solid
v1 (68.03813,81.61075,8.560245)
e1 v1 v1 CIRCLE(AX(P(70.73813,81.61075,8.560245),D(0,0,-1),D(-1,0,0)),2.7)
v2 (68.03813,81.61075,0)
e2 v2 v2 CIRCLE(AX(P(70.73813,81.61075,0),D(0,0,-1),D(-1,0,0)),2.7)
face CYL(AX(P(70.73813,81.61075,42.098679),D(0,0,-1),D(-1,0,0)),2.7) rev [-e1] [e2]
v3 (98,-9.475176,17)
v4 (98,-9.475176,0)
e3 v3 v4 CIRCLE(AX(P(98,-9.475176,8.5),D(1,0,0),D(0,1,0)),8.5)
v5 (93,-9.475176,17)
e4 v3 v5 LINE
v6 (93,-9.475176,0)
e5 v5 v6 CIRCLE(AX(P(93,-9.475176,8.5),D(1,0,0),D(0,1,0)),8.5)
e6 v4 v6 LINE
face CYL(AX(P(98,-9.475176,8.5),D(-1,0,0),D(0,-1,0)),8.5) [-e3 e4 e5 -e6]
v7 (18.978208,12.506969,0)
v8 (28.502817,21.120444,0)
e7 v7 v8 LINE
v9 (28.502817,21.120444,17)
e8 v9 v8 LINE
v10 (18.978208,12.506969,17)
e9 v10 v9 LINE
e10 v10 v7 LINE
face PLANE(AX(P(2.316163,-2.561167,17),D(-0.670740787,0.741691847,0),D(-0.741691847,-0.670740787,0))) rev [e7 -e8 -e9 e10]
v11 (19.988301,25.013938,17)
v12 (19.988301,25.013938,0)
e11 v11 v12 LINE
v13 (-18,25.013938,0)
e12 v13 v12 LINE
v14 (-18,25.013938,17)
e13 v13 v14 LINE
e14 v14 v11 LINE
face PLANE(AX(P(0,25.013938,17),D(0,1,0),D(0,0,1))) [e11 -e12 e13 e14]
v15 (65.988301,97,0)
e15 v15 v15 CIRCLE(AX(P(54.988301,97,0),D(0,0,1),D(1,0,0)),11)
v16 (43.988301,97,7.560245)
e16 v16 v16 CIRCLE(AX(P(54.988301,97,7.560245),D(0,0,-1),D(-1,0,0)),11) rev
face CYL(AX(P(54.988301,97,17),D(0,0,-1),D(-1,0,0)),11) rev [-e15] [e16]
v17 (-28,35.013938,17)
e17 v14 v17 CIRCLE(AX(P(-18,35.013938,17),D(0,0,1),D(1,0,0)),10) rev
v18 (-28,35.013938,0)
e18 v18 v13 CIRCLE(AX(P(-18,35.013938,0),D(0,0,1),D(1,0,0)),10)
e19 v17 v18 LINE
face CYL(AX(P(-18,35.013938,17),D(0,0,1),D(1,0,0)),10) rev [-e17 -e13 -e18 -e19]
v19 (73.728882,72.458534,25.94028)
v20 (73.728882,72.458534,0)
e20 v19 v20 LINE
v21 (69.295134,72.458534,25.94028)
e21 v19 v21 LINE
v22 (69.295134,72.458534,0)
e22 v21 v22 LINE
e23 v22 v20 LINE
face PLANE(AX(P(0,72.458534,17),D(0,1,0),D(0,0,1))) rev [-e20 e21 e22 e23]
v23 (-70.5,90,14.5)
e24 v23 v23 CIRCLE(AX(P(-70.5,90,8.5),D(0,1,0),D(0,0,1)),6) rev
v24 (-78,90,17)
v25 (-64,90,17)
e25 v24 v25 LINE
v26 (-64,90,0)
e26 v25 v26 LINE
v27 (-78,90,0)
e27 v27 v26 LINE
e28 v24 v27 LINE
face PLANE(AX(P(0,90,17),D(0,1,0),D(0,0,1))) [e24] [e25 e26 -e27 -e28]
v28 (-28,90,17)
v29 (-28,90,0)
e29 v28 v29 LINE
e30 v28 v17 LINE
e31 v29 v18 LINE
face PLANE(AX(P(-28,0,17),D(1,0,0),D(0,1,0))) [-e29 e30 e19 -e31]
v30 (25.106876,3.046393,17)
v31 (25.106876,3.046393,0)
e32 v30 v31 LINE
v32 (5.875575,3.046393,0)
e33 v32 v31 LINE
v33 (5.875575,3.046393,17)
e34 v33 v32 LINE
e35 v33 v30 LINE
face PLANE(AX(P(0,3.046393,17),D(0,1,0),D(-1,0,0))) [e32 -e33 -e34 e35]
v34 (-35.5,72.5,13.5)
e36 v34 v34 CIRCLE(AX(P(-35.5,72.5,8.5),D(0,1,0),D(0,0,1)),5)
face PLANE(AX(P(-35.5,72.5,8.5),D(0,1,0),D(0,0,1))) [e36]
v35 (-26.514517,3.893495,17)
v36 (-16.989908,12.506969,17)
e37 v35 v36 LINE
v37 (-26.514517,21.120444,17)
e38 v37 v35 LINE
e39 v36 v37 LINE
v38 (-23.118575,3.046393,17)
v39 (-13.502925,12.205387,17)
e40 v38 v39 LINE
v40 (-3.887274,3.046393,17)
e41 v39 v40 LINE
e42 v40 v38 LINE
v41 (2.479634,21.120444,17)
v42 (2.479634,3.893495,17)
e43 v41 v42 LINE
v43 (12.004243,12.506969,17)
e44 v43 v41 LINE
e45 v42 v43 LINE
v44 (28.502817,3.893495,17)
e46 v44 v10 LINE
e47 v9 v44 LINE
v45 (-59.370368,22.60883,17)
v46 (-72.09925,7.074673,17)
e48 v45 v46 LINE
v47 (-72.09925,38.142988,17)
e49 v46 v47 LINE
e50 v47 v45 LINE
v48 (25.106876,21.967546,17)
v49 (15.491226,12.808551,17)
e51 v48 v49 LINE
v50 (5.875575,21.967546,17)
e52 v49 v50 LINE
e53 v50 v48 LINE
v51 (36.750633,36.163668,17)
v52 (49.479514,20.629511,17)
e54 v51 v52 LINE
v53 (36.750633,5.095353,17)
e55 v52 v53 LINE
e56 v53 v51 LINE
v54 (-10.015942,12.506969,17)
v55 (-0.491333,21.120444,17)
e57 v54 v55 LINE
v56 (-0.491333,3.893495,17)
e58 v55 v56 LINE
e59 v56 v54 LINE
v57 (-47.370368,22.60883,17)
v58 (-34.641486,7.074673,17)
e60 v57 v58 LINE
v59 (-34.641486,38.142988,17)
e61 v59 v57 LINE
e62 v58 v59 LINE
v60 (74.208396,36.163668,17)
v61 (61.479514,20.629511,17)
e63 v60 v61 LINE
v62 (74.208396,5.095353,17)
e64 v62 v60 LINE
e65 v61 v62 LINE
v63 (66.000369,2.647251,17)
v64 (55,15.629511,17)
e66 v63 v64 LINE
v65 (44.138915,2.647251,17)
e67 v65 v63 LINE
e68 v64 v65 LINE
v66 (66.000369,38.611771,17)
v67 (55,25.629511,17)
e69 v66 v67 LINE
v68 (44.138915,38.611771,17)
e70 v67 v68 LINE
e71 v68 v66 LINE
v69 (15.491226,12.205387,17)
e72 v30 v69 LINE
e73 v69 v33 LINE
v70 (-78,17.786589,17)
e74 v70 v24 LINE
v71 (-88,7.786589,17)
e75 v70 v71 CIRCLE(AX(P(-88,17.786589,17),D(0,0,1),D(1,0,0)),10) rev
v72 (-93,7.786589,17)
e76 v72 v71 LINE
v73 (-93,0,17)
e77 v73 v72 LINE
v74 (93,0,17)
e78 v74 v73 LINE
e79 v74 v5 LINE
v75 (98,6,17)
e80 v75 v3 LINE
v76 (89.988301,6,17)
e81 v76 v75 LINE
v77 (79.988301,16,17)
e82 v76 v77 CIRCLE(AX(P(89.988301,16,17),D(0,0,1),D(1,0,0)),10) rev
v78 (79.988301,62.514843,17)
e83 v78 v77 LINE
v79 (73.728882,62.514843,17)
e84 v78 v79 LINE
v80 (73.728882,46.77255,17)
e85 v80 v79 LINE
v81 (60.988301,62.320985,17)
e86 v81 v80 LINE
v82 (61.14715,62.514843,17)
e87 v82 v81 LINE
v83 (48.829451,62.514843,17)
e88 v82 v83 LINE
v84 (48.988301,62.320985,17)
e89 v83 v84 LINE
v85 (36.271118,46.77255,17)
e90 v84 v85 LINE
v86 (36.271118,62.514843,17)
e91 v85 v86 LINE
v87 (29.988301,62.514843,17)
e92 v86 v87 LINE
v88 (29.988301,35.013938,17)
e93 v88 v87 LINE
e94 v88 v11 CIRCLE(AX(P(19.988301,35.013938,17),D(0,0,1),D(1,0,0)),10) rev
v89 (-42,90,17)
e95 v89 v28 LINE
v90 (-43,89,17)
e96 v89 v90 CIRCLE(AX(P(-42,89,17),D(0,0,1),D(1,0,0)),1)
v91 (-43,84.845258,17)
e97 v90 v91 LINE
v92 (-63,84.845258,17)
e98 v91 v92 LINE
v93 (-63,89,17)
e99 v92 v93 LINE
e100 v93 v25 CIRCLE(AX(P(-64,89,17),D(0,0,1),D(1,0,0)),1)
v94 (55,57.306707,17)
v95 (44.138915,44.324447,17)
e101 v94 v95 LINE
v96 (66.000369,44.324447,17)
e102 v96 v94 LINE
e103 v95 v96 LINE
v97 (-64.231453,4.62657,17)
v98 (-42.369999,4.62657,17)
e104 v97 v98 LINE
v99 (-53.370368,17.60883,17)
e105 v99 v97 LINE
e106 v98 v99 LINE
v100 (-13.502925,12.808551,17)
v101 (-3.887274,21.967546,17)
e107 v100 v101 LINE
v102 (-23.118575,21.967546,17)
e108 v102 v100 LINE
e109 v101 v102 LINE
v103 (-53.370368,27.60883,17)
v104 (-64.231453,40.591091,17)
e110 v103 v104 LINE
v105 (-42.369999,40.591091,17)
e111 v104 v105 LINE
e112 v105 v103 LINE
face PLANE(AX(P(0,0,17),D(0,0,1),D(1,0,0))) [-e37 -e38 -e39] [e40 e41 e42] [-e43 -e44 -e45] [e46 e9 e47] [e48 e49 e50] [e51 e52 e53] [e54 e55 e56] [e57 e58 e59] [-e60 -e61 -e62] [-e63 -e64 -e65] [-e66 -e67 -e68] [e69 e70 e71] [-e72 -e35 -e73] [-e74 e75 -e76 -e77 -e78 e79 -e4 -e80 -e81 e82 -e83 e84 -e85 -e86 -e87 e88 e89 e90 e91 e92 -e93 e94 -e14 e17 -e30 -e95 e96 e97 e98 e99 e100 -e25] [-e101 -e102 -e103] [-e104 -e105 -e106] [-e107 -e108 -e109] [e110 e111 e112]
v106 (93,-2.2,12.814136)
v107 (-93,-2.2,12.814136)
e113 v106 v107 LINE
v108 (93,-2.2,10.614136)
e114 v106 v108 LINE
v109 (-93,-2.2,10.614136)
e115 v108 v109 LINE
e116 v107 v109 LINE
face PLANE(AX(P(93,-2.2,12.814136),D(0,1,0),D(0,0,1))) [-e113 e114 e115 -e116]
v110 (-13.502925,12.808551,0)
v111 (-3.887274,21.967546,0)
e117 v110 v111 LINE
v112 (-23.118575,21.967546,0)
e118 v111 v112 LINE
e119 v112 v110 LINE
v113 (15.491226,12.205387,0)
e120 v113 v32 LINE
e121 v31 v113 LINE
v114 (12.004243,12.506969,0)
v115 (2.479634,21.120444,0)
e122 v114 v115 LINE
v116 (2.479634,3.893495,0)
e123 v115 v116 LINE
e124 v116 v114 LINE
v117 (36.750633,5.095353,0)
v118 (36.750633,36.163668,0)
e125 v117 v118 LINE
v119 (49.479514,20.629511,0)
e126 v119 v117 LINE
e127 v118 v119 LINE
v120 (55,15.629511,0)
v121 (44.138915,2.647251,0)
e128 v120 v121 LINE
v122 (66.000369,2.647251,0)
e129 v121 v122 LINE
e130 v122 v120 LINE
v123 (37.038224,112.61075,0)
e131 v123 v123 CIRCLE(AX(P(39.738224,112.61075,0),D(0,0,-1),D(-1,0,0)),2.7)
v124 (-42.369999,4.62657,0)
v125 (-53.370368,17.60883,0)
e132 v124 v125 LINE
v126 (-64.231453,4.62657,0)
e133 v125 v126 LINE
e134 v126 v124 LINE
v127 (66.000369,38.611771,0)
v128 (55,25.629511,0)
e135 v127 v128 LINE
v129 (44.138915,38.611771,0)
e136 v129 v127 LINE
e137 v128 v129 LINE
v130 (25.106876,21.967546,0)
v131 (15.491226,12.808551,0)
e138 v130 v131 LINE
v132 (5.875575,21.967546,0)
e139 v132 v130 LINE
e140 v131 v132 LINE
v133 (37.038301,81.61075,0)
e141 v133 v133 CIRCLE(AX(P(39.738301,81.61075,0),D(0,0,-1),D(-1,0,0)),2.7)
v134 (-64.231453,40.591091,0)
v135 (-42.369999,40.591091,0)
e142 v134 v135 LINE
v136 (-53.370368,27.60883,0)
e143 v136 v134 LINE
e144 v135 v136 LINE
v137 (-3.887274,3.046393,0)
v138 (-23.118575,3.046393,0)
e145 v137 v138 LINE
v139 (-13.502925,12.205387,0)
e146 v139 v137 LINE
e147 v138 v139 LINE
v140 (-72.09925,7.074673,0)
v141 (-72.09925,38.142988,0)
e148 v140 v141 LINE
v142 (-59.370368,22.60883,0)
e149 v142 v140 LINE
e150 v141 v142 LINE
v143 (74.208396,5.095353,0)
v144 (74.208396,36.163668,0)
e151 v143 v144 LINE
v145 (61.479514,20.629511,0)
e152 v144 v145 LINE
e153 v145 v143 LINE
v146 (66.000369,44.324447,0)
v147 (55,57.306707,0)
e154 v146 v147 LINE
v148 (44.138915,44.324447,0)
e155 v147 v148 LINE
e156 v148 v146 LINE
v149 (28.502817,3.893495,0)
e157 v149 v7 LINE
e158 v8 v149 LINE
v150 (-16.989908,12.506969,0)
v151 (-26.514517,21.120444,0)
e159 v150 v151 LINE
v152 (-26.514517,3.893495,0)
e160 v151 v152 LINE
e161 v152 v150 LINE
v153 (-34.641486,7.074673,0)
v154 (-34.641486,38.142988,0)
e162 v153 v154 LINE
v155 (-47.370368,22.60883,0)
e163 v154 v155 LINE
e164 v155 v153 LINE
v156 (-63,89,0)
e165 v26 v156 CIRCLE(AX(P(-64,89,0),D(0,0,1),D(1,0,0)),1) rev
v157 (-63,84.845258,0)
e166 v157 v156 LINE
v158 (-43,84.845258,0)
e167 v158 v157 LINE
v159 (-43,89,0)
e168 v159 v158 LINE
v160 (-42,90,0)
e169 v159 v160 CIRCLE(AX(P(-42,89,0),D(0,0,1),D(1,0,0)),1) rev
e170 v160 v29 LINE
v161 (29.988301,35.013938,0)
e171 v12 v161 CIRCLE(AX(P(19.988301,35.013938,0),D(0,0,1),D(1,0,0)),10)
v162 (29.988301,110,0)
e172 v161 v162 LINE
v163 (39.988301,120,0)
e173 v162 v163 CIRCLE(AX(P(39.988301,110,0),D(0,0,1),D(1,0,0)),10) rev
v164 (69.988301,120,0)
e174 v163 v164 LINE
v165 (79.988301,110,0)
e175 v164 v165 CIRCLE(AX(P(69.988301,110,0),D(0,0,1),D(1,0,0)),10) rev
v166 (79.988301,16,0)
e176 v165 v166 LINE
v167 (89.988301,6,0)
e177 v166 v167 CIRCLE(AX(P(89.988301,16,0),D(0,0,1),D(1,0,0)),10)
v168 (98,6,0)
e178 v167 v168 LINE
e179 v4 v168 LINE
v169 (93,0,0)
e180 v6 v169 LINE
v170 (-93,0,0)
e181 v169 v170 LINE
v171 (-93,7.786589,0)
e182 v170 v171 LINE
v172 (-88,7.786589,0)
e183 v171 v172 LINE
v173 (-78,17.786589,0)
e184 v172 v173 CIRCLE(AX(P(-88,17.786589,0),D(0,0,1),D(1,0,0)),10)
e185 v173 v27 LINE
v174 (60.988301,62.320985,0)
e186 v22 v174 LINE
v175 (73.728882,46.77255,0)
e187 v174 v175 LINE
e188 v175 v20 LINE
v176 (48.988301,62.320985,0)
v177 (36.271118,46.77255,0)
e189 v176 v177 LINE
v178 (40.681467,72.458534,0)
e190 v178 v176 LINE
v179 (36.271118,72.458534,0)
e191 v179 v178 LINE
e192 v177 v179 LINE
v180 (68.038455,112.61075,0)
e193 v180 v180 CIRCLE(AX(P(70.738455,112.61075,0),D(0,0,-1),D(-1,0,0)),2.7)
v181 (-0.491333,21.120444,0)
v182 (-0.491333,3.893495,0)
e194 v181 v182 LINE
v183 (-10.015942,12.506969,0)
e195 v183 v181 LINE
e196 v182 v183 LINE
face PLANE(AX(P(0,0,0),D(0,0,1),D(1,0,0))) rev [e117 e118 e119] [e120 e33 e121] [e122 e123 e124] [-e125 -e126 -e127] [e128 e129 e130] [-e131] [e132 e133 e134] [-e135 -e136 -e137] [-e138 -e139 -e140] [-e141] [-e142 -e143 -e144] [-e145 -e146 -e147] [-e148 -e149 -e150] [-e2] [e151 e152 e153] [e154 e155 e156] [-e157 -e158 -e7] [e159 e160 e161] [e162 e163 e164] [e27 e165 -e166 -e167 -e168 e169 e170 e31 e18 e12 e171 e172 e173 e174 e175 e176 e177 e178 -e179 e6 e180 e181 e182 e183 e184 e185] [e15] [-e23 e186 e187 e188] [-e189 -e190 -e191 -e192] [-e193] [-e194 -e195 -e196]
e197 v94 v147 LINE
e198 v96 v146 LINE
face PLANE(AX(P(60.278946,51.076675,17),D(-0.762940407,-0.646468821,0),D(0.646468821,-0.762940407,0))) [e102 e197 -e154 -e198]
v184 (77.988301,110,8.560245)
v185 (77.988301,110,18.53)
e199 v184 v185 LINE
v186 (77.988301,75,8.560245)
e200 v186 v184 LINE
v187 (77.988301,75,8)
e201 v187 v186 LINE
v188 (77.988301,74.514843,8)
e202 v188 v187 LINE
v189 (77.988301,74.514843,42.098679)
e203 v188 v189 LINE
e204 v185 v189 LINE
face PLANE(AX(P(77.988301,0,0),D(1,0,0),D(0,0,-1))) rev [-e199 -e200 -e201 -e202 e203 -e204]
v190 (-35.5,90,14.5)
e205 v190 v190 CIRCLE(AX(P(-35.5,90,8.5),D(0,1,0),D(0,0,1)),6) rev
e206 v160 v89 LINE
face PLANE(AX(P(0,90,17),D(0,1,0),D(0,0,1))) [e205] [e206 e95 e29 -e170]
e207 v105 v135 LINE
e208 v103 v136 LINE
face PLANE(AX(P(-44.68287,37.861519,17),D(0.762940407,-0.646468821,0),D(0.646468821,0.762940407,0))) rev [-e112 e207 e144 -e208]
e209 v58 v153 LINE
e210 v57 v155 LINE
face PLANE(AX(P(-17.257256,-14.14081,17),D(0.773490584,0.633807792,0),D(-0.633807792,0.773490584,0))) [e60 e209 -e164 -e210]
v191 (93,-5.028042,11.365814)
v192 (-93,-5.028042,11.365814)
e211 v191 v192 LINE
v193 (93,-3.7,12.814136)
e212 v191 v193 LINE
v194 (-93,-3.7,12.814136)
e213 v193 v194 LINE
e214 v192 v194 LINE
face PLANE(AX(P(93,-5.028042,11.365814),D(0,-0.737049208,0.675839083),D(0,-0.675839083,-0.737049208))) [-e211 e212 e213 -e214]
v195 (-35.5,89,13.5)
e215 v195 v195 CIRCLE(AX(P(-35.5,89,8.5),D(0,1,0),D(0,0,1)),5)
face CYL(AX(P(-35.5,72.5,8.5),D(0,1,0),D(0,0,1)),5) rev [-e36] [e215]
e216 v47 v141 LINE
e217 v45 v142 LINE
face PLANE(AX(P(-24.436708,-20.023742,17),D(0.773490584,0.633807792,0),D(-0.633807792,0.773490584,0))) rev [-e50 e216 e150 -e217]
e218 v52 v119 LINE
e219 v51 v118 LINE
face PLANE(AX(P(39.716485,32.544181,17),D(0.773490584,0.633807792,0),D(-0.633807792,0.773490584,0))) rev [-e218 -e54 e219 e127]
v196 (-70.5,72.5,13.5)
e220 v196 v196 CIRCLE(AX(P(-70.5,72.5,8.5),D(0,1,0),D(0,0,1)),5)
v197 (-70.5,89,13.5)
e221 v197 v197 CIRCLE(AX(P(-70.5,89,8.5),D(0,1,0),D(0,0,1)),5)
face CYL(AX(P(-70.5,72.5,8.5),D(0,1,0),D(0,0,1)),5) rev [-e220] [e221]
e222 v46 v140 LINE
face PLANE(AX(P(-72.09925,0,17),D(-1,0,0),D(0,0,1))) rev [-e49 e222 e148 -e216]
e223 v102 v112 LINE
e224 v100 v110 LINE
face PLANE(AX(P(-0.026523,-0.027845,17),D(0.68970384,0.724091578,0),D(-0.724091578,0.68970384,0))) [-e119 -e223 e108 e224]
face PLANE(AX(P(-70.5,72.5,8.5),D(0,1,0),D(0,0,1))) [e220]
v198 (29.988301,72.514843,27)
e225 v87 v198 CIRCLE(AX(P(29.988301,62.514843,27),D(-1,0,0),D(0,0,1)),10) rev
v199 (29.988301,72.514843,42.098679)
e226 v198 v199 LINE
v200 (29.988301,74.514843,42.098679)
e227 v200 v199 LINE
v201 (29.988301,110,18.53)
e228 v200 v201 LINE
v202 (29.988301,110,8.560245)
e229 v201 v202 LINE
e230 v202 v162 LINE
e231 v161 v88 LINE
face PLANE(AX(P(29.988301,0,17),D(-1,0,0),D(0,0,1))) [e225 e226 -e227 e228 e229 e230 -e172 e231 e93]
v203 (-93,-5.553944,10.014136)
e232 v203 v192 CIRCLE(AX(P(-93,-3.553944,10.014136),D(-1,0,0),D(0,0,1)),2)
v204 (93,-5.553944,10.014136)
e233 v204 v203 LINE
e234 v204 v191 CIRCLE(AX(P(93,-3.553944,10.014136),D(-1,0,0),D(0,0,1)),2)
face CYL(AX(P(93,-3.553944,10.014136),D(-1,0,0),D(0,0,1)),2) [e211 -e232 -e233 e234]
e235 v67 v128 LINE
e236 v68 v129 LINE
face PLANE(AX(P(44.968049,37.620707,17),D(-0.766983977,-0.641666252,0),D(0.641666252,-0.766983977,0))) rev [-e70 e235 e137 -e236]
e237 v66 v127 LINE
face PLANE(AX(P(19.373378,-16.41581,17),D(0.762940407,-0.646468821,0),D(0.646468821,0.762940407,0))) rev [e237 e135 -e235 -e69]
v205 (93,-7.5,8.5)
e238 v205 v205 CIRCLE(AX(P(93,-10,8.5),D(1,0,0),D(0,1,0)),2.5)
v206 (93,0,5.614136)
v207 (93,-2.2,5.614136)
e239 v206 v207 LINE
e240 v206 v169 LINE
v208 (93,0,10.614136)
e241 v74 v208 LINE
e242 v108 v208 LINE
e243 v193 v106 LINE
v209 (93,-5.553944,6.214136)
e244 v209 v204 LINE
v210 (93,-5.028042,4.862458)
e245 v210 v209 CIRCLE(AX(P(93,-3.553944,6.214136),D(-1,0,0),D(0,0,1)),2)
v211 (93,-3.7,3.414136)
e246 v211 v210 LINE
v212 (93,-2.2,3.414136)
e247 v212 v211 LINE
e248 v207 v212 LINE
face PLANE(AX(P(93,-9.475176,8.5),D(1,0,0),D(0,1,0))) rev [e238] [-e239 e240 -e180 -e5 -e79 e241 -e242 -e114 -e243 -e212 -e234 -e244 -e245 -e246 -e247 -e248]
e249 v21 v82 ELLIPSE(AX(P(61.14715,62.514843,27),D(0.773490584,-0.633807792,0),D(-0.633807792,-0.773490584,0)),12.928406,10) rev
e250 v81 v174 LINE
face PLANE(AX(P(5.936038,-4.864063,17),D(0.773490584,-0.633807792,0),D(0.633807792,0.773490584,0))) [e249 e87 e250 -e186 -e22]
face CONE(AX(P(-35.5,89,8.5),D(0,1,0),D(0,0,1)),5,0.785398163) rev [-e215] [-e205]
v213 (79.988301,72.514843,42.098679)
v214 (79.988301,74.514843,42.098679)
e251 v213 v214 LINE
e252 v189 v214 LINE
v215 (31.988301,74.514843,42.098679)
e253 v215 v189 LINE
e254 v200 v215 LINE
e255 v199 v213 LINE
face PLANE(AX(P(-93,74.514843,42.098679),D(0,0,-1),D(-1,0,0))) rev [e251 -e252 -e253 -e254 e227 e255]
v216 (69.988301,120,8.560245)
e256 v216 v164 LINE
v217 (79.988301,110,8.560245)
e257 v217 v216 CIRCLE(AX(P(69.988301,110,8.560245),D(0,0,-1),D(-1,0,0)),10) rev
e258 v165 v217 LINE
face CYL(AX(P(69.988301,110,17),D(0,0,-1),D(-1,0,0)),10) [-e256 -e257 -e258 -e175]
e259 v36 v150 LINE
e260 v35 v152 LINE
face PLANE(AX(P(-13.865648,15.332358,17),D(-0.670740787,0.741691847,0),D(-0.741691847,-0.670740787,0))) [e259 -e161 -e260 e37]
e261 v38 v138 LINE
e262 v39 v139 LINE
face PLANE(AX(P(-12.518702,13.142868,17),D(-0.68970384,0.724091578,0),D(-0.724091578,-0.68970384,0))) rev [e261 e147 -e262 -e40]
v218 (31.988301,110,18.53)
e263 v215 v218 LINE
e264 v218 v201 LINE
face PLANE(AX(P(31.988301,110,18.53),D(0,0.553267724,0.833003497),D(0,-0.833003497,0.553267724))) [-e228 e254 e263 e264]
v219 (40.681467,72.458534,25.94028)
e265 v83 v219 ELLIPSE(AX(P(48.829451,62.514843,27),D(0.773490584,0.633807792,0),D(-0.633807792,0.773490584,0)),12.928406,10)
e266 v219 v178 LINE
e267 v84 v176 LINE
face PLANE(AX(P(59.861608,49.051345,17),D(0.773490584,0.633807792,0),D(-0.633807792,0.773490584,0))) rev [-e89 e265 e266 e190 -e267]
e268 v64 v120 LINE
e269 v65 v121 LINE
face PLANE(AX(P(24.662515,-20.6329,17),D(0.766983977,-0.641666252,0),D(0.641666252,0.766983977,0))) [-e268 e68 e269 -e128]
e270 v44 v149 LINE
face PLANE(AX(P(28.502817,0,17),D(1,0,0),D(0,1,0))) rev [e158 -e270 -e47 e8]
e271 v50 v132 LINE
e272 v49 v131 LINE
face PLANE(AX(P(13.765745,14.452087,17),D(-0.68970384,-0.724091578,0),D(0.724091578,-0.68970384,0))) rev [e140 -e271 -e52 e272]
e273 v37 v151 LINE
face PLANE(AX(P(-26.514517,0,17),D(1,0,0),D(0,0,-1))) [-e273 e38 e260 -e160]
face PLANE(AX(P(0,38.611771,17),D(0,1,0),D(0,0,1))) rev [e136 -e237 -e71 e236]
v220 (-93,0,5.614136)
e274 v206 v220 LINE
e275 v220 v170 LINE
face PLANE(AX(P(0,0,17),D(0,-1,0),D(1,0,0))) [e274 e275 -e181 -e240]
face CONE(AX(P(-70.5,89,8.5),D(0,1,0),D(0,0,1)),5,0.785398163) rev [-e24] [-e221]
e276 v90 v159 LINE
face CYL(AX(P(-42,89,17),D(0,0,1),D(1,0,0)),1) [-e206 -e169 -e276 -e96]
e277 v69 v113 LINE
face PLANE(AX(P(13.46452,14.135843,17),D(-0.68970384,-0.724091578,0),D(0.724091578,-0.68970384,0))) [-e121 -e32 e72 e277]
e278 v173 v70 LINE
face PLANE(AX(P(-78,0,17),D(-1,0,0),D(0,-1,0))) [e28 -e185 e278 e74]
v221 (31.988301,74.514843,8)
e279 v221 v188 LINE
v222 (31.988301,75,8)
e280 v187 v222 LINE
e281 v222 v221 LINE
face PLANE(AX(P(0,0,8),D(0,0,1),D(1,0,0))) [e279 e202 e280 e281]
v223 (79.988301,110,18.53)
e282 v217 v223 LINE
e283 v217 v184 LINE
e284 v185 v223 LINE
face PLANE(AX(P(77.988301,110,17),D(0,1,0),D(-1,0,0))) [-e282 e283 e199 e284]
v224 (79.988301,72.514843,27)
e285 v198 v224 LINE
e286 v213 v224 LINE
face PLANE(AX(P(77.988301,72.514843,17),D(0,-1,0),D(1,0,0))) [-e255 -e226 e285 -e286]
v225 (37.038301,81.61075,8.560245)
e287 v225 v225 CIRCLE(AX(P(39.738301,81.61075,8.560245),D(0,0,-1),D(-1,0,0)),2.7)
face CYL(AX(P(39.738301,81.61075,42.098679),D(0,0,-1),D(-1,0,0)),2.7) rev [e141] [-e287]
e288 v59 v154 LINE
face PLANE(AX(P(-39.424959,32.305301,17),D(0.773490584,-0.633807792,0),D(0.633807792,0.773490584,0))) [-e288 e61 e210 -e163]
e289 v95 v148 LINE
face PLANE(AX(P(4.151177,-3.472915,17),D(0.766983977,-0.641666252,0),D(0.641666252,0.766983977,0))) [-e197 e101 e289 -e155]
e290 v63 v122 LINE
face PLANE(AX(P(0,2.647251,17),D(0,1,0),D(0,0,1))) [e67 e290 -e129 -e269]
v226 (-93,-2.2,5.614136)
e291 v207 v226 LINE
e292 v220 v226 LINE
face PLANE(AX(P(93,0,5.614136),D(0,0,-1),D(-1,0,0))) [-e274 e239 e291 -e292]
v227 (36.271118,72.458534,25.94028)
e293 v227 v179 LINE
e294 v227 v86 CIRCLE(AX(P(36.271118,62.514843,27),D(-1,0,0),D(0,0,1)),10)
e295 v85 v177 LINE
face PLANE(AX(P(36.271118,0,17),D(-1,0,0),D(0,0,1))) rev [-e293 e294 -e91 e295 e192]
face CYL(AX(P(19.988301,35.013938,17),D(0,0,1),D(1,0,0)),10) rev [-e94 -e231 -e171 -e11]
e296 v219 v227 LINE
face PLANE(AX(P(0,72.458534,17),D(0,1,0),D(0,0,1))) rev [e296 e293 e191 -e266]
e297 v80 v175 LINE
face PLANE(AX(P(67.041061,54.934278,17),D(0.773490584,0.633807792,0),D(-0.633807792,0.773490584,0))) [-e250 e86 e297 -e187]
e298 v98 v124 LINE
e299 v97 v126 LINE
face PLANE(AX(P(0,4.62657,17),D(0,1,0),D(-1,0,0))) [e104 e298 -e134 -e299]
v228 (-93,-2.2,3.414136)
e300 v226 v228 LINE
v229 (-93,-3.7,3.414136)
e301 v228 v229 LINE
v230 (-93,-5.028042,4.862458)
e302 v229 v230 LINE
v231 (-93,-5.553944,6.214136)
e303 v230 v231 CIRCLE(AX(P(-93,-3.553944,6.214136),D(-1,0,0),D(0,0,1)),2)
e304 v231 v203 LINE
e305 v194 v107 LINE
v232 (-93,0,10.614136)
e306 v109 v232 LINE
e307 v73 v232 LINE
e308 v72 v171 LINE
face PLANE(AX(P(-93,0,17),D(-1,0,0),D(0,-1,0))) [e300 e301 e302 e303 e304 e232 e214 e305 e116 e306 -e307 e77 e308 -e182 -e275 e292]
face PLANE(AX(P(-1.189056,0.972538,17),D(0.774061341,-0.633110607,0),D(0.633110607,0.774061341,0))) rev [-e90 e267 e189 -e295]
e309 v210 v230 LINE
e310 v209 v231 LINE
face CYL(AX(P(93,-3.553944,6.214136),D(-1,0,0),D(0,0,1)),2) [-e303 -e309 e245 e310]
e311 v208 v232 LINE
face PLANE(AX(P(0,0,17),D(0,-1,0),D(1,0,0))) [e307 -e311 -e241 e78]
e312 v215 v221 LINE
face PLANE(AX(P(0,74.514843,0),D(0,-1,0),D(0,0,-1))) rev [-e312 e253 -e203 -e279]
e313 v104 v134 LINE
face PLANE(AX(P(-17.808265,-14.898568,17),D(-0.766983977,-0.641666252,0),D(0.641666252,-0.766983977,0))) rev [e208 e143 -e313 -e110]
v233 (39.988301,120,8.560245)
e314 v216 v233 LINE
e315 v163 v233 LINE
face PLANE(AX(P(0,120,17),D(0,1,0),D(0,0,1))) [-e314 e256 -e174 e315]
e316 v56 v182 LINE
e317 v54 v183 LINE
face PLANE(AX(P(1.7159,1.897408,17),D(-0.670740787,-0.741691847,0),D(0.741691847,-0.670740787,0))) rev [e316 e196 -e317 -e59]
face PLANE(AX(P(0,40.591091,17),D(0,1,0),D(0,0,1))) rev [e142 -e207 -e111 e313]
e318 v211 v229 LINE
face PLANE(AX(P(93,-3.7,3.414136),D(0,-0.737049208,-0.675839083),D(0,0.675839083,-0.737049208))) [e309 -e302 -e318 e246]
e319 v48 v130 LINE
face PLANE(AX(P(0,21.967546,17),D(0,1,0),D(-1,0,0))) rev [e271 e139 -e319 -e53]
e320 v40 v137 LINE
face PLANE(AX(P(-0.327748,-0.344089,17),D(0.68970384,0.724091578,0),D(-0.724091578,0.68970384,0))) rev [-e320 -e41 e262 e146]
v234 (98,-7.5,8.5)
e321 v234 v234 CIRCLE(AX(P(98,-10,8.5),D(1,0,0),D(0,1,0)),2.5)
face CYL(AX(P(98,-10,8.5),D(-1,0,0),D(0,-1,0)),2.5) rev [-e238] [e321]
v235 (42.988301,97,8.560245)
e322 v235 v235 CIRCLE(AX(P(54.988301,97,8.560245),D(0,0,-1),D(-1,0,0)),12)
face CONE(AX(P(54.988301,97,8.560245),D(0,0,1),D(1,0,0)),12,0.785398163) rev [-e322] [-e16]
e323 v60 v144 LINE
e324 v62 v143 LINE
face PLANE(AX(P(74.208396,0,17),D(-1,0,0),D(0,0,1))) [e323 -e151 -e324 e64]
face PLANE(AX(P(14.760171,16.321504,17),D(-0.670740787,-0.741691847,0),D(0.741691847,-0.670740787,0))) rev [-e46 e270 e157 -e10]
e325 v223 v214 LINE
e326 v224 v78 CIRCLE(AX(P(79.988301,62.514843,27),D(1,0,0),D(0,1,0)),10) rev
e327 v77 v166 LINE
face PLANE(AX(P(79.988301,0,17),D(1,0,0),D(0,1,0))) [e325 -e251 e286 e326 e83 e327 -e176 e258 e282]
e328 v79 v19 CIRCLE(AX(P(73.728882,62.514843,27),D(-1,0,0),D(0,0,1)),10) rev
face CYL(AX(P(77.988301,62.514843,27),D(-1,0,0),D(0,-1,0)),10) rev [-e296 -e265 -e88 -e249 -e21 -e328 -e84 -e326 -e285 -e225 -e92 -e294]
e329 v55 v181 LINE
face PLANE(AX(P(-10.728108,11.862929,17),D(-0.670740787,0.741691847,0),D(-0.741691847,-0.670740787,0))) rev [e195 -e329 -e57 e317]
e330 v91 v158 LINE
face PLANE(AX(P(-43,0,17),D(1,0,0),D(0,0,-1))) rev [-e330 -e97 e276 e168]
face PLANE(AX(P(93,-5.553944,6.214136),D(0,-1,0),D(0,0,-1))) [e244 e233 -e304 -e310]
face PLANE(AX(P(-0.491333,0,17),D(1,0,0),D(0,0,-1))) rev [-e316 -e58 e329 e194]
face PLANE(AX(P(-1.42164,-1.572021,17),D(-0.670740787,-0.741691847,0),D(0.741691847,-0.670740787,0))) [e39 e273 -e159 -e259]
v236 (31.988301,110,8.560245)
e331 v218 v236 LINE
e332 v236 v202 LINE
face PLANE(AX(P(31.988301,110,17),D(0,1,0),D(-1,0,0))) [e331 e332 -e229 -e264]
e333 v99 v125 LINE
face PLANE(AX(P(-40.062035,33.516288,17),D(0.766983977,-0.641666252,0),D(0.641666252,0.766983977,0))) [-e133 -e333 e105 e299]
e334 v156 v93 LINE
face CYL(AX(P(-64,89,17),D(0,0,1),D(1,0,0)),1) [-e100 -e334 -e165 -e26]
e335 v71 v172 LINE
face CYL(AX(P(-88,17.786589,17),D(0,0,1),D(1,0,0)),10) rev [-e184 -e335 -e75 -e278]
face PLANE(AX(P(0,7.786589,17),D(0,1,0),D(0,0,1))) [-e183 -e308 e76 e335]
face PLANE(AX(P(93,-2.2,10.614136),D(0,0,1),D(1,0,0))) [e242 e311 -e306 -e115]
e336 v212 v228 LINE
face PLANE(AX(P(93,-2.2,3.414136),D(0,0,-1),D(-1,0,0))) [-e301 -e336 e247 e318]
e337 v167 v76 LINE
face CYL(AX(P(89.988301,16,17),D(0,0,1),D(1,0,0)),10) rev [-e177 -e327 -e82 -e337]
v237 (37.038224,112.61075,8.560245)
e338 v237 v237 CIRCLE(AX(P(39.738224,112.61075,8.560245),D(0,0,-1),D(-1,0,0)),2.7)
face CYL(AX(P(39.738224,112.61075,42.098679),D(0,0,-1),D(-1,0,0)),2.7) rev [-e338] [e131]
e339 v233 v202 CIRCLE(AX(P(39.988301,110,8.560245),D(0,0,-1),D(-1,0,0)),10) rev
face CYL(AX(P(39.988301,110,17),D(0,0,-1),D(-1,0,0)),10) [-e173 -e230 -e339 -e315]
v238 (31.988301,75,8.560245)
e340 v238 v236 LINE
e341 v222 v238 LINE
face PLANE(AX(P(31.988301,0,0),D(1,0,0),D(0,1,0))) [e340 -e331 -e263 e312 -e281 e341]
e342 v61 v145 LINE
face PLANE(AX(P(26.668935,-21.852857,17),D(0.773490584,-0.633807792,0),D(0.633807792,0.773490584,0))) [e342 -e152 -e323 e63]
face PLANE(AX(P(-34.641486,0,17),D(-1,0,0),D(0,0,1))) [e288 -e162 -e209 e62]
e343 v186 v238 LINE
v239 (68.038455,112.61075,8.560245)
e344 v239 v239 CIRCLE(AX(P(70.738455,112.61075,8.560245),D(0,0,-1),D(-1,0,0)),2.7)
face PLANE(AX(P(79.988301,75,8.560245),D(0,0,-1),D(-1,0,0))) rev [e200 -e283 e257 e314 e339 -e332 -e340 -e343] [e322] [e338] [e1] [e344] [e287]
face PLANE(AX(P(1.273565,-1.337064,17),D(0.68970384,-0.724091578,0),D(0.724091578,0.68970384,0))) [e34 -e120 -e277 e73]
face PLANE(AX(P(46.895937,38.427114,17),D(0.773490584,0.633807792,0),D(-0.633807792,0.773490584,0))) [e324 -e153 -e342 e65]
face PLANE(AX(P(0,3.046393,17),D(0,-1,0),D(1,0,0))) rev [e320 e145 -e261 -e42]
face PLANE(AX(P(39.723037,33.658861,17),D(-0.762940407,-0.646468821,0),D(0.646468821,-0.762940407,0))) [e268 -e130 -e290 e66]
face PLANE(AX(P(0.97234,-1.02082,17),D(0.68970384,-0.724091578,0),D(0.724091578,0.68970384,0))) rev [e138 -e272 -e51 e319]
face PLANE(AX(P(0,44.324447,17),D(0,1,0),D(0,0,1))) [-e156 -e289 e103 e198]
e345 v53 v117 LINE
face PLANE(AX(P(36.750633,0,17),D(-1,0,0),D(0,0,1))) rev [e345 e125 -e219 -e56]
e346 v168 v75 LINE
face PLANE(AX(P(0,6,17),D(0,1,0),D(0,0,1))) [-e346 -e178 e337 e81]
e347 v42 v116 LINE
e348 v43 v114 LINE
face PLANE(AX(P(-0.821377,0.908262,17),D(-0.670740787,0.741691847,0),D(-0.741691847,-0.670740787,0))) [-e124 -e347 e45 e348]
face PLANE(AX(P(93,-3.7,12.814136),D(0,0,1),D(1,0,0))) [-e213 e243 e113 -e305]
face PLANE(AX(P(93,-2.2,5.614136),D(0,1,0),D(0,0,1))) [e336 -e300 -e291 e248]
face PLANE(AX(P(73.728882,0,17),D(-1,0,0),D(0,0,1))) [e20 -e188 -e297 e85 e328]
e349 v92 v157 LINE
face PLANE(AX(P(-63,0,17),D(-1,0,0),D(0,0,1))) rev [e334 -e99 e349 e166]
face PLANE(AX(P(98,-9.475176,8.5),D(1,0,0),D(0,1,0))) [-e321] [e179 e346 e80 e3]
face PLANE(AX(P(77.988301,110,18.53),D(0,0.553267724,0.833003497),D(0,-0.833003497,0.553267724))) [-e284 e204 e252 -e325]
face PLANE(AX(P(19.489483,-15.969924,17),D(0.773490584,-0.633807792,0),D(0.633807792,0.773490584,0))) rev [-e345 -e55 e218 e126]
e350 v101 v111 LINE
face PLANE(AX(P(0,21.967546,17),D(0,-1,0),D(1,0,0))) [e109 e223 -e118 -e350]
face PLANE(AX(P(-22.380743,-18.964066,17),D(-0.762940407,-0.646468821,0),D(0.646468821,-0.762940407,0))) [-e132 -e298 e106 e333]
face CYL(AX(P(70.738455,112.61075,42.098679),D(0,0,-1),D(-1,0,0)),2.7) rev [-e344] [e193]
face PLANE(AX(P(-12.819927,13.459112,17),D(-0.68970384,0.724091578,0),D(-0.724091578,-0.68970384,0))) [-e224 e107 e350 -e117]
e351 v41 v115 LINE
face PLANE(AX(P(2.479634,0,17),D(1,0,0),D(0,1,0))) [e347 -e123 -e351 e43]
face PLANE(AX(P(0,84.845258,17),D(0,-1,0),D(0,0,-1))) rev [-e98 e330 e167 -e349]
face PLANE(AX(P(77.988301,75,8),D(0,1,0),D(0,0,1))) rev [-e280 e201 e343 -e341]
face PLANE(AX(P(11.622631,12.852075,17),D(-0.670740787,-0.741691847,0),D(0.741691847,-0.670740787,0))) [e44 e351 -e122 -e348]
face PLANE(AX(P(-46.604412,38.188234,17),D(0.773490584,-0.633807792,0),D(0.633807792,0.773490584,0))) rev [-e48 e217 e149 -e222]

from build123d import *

# Parameters (mm, degrees)
CROQUIS1_R                = 11
SALIENTE_EXTRUIR1_DEPTH   = 17
REDONDEO1_R               = 10
REDONDEO2_R               = 10
REDONDEO8_R               = 10
REDONDEO9_R               = 10
REDONDEO11_R              = 10
REDONDEO12_R              = 10
SALIENTE_EXTRUIR2_DEPTH   = 186
CROQUIS5_R                = 2.5
SALIENTE_EXTRUIR6_DEPTH   = 5
CORTAR_EXTRUIR5_START     = -5
CORTAR_EXTRUIR5_OUTLINE_R = 11
CORTAR_EXTRUIR5_DEPTH     = 5
SALIENTE_EXTRUIR7_DEPTH   = 2
SALIENTE_EXTRUIR8_DEPTH   = 2
CROQUIS16_W               = 46
CROQUIS16_H               = 26.427047574
SALIENTE_EXTRUIR9_DEPTH   = 2
CROQUIS18_W               = 50
CROQUIS18_H               = 8.439754805
CORTAR_EXTRUIR7_DEPTH     = 45
CROQUIS19_W               = 2
CROQUIS19_H               = 8.439754805
SALIENTE_EXTRUIR10_DEPTH  = 35
CROQUIS20_W               = 46
CROQUIS20_H               = 0.485157357
CORTAR_EXTRUIR8_DEPTH     = 9
REDONDEO13_R              = 10
SKETCH1_W                 = 1.328368311
SKETCH1_H                 = 2
CUT_EXTRUDE1_DEPTH        = 215.967115272
SKETCH3_R                 = 2.7
CUT_EXTRUDE2_DEPTH        = 161.549988464
SKETCH4_R                 = 5
CUT_EXTRUDE3_DEPTH        = 17.5
FILLET1_R                 = 1
CHAMFER1_SIZE             = 1


# Read off the part's stored shape, not the designer's step: Cortar-Extruir5
with BuildPart() as part:
    # Croquis1 → Saliente-Extruir1 (new body)
    with BuildSketch(Plane.XY):
        Polygon((-93, 0), (93, 0), (93, 6), (79.988300723, 6), (79.988300723, 120), (29.988300723, 120), (29.988300723, 25.013938177), (-28, 25.013938177), (-28, 90), (-43, 90), (-43, 84.845258293), (-63, 84.845258293), (-63, 90), (-78, 90), (-78, 7.786589187), (-93, 7.786589187), align=None)
        Polygon((-53.370368055, 17.608830496), (-42.369998576, 4.626570416), (-64.231453048, 4.626570416), align=None, mode=Mode.SUBTRACT)
        Polygon((-72.099249791, 38.14298816), (-59.370368055, 22.608830496), (-72.099249791, 7.074672833), align=None, mode=Mode.SUBTRACT)
        Polygon((-3.887274434, 3.04639267), (-23.118575204, 3.04639267), (-13.502924819, 12.205387461), align=None, mode=Mode.SUBTRACT)
        Polygon((-26.514516656, 3.893494584), (-26.514516656, 21.120443592), (-16.989907544, 12.506969088), align=None, mode=Mode.SUBTRACT)
        Polygon((-10.015942094, 12.506969088), (-0.491332982, 21.120443592), (-0.491332982, 3.893494584), align=None, mode=Mode.SUBTRACT)
        Polygon((-34.641486319, 7.074672833), (-47.370368055, 22.608830496), (-34.641486319, 38.14298816), align=None, mode=Mode.SUBTRACT)
        Polygon((-13.502924819, 12.808550716), (-23.118575204, 21.967545507), (-3.887274434, 21.967545507), align=None, mode=Mode.SUBTRACT)
        Polygon((-53.370368055, 27.608830496), (-64.231453048, 40.591090577), (-42.369998576, 40.591090577), align=None, mode=Mode.SUBTRACT)
        Polygon((2.479633706, 3.893494584), (2.479633706, 21.120443592), (12.004242818, 12.506969088), align=None, mode=Mode.SUBTRACT)
        Polygon((5.875575158, 3.04639267), (15.491225543, 12.205387461), (25.106875927, 3.04639267), align=None, mode=Mode.SUBTRACT)
        Polygon((28.50281738, 21.120443592), (28.50281738, 3.893494584), (18.978208267, 12.506969088), align=None, mode=Mode.SUBTRACT)
        Polygon((5.875575158, 21.967545507), (25.106875927, 21.967545507), (15.491225543, 12.808550716), align=None, mode=Mode.SUBTRACT)
        Polygon((36.750632631, 36.163668304), (49.479514367, 20.629510641), (36.750632631, 5.095352977), align=None, mode=Mode.SUBTRACT)
        Polygon((55, 15.629510641), (66.000369479, 2.64725056), (44.138915007, 2.64725056), align=None, mode=Mode.SUBTRACT)
        Polygon((74.208396103, 5.095352977), (61.479514367, 20.629510641), (74.208396103, 36.163668304), align=None, mode=Mode.SUBTRACT)
        Polygon((40.681467462, 72.45853374), (48.988300723, 62.320985113), (36.271118264, 46.772549809), (36.271118264, 72.45853374), align=None, mode=Mode.SUBTRACT)
        Polygon((55, 25.629510641), (44.138915007, 38.611770721), (66.000369479, 38.611770721), align=None, mode=Mode.SUBTRACT)
        Polygon((55, 57.306707472), (66.000369479, 44.324447392), (44.138915007, 44.324447392), align=None, mode=Mode.SUBTRACT)
        Polygon((73.728881736, 46.772549809), (60.988300723, 62.320985113), (69.295133985, 72.45853374), (73.728881736, 72.45853374), align=None, mode=Mode.SUBTRACT)
        with Locations((54.988300723, 97)):
            Circle(CROQUIS1_R, mode=Mode.SUBTRACT)
    extrude(amount=SALIENTE_EXTRUIR1_DEPTH)

    # Redondeo1
    redondeo1_edges = [part.edges().sort_by_distance(p)[0] for p in [
        (79.988300723, 120, 8.5),
    ]]
    fillet(redondeo1_edges, radius=REDONDEO1_R)

    # Redondeo2
    redondeo2_edges = [part.edges().sort_by_distance(p)[0] for p in [
        (29.988300723, 120, 8.5),
    ]]
    fillet(redondeo2_edges, radius=REDONDEO2_R)

    # Redondeo8
    redondeo8_edges = [part.edges().sort_by_distance(p)[0] for p in [
        (29.988300723, 25.013938177, 8.5),
    ]]
    fillet(redondeo8_edges, radius=REDONDEO8_R)

    # Redondeo9
    redondeo9_edges = [part.edges().sort_by_distance(p)[0] for p in [
        (-28, 25.013938177, 8.5),
    ]]
    fillet(redondeo9_edges, radius=REDONDEO9_R)

    # Redondeo11
    redondeo11_edges = [part.edges().sort_by_distance(p)[0] for p in [
        (79.988300723, 6, 8.5),
    ]]
    fillet(redondeo11_edges, radius=REDONDEO11_R)

    # Redondeo12
    redondeo12_edges = [part.edges().sort_by_distance(p)[0] for p in [
        (-78, 7.786589187, 8.5),
    ]]
    fillet(redondeo12_edges, radius=REDONDEO12_R)

    # Croquis4 → Saliente-Extruir2 (add)
    with BuildSketch(Plane.ZY.offset(93)):
        with BuildLine():
            Line((5.614135824, 0), (5.614135824, -2.2))
            Line((5.614135824, -2.2), (3.414135824, -2.2))
            Line((3.414135824, -2.2), (3.414135824, -3.7))
            Line((3.414135824, -3.7), (4.862457658, -5.028042266))
            ThreePointArc((4.862457658, -5.028042266), (5.488945101, -5.4178372), (6.214135824, -5.553943851))
            Line((6.214135824, -5.553943851), (10.014135824, -5.553943851))
            ThreePointArc((10.014135824, -5.553943851), (10.739326546, -5.4178372), (11.365813989, -5.028042266))
            Line((11.365813989, -5.028042266), (12.814135824, -3.7))
            Line((12.814135824, -3.7), (12.814135824, -2.2))
            Line((12.814135824, -2.2), (10.614135824, -2.2))
            Line((10.614135824, -2.2), (10.614135824, 0))
            Line((10.614135824, 0), (5.614135824, 0))
        make_face()
    extrude(amount=-SALIENTE_EXTRUIR2_DEPTH)

    # Croquis5 → Saliente-Extruir6 (add)
    with BuildSketch(Plane(origin=(93, 0, 0), x_dir=(0, 0, -1), z_dir=(1, 0, 0))):
        with BuildLine():
            Line((-17, 6), (0, 6))
            Line((0, 6), (0, 0))
            Line((0, 0), (0, -9.475176398))
            ThreePointArc((0, -9.475176398), (-8.5, -17.975176398), (-17, -9.475176398))
            Line((-17, -9.475176398), (-17, 0))
            Line((-17, 0), (-17, 6))
        make_face()
        with Locations(Location((-8.5, -10, 0), (0, 0, 90))):
            Circle(CROQUIS5_R, mode=Mode.SUBTRACT)
    extrude(amount=SALIENTE_EXTRUIR6_DEPTH)

    # Cortar-Extruir5 outline → Cortar-Extruir5 (cut)
    with BuildSketch(Plane.XY.offset(17).offset(CORTAR_EXTRUIR5_START)):
        with BuildLine():
            ThreePointArc((36.990583657, 100.021275878), (34.88853317, 96.589149148), (37.130323879, 93.246622476))
            Line((37.130323879, 93.246622476), (49.081988054, 86.302507362))
            ThreePointArc((49.081988054, 86.302507362), (55.135782124, 84.669748862), (61.191322119, 86.29602016))
            Line((61.191322119, 86.29602016), (73.177641255, 93.243103052))
            ThreePointArc((73.177641255, 93.243103052), (75.516378848, 96.608558865), (73.365004561, 100.096763995))
            Line((73.365004561, 100.096763995), (61.202501164, 107.163380194))
            ThreePointArc((61.202501164, 107.163380194), (55.196638443, 108.796017791), (49.176296726, 107.217607778))
            Line((49.176296726, 107.217607778), (36.990583657, 100.021275878))
        make_face()
        with Locations((54.988300723, 97)):
            Circle(CORTAR_EXTRUIR5_OUTLINE_R, mode=Mode.SUBTRACT)
    extrude(amount=CORTAR_EXTRUIR5_DEPTH, mode=Mode.SUBTRACT)

    # Croquis14 → Saliente-Extruir7 (add)
    with BuildSketch(Plane(origin=(79.988300723, 0, 0), x_dir=(0, 0, -1), z_dir=(1, 0, 0))):
        Polygon((-17, 110), (-17, 72.514842643), (-43.427047574, 72.514842643), (-18.53, 110), align=None)
    extrude(amount=-SALIENTE_EXTRUIR7_DEPTH)

    # Croquis15 → Saliente-Extruir8 (add)
    with BuildSketch(Plane.ZY.offset(-29.988300723)):
        Polygon((17, 110), (18.53, 110), (43.427047574, 72.514842643), (17, 72.514842643), align=None)
    extrude(amount=-SALIENTE_EXTRUIR8_DEPTH)

    # Croquis16 → Saliente-Extruir9 (add)
    with BuildSketch(Plane.XZ.offset(-72.514842643)):
        with Locations((54.988300723, 30.213523787)):
            Rectangle(CROQUIS16_W, CROQUIS16_H)
    extrude(amount=-SALIENTE_EXTRUIR9_DEPTH)

    # Croquis18 → Cortar-Extruir7 (cut)
    with BuildSketch(Plane(origin=(0, 120, 0), x_dir=(1, 0, 0), z_dir=(0, 1, 0))):
        with Locations((54.988300723, -12.780122598)):
            Rectangle(CROQUIS18_W, CROQUIS18_H)
    extrude(amount=-CORTAR_EXTRUIR7_DEPTH, mode=Mode.SUBTRACT)

    # Croquis19 → Saliente-Extruir10 (add)
    with BuildSketch(Plane(origin=(0, 110, 0), x_dir=(1, 0, 0), z_dir=(0, 1, 0))):
        with Locations((78.988300723, -12.780122598)):
            Rectangle(CROQUIS19_W, CROQUIS19_H)
        with Locations((30.988300723, -12.780122598)):
            Rectangle(CROQUIS19_W, CROQUIS19_H)
    extrude(amount=-SALIENTE_EXTRUIR10_DEPTH)

    # Croquis20 → Cortar-Extruir8 (cut)
    with BuildSketch(Plane.XY.offset(17)):
        with Locations((54.988300723, 74.757421322)):
            Rectangle(CROQUIS20_W, CROQUIS20_H)
    extrude(amount=-CORTAR_EXTRUIR8_DEPTH, mode=Mode.SUBTRACT)

    # Redondeo13
    # the kernel refuses this fillet: 10 mm, written as the material it adds along each edge
    with BuildSketch(Plane(origin=(79.988300723, 72.514842643, 17), x_dir=(0, 0, 1), z_dir=(-1, 0, 0))) as redondeo13_piece_1_section:
        with BuildLine():
            CenterArc((REDONDEO13_R, -REDONDEO13_R), REDONDEO13_R, 90, 90)
            Line((0, -REDONDEO13_R), (0, 0))
            Line((0, 0), (REDONDEO13_R, 0))
        make_face()
    redondeo13_piece_1 = extrude(amount=50, mode=Mode.PRIVATE)
    redondeo13_piece_1 = split(redondeo13_piece_1, bisect_by=Plane(origin=(76.85859123, 72.45853374, 21.649915329), z_dir=(0, 1, 0)), keep=Keep.TOP, mode=Mode.PRIVATE)
    add(redondeo13_piece_1)
    with BuildSketch(Plane(origin=(79.988300723, 72.514842643, 17), x_dir=(0, 0, 1), z_dir=(-1, 0, 0))) as redondeo13_piece_2_section:
        with BuildLine():
            CenterArc((REDONDEO13_R, -REDONDEO13_R), REDONDEO13_R, 90, 90)
            Line((0, -REDONDEO13_R), (0, 0))
            Line((0, 0), (REDONDEO13_R, 0))
        make_face()
    redondeo13_piece_2 = extrude(amount=75, mode=Mode.PRIVATE)
    redondeo13_piece_2 = split(redondeo13_piece_2, bisect_by=Plane(origin=(73.728881736, 70.226028868, 19.173289303), z_dir=(1, 0, 0)), keep=Keep.TOP, mode=Mode.PRIVATE)
    add(redondeo13_piece_2)
    with BuildSketch(Plane(origin=(104.988300723, 72.514842643, 17), x_dir=(0, 0, 1), z_dir=(-1, 0, 0))) as redondeo13_piece_3_section:
        with BuildLine():
            CenterArc((REDONDEO13_R, -REDONDEO13_R), REDONDEO13_R, 90, 90)
            Line((0, -REDONDEO13_R), (0, 0))
            Line((0, 0), (REDONDEO13_R, 0))
        make_face()
    redondeo13_piece_3 = extrude(amount=100, mode=Mode.PRIVATE)
    redondeo13_piece_3 = split(redondeo13_piece_3, bisect_by=Plane(origin=(62.565438467, 64.245703, 19.303543537), z_dir=(-0.7734905837611198, 0.6338077917104541, 0)), keep=Keep.TOP, mode=Mode.PRIVATE)
    redondeo13_piece_3 = split(redondeo13_piece_3, bisect_by=Plane(origin=(47.41116298, 64.245703, 19.303543537), z_dir=(0.7734905837611216, 0.6338077917104518, 0)), keep=Keep.TOP, mode=Mode.PRIVATE)
    add(redondeo13_piece_3)
    with BuildSketch(Plane(origin=(104.988300723, 72.514842643, 17), x_dir=(0, 0, 1), z_dir=(-1, 0, 0))) as redondeo13_piece_4_section:
        with BuildLine():
            CenterArc((REDONDEO13_R, -REDONDEO13_R), REDONDEO13_R, 90, 90)
            Line((0, -REDONDEO13_R), (0, 0))
            Line((0, 0), (REDONDEO13_R, 0))
        make_face()
    redondeo13_piece_4 = extrude(amount=75, mode=Mode.PRIVATE)
    redondeo13_piece_4 = split(redondeo13_piece_4, bisect_by=Plane(origin=(36.271118264, 70.226028868, 19.173289303), z_dir=(-1, 0, 0)), keep=Keep.TOP, mode=Mode.PRIVATE)
    add(redondeo13_piece_4)

    # Sketch1 → Cut-Extrude1 (cut, through all)
    with BuildSketch(Plane(origin=(79.988300723, 0, 0), x_dir=(0, 0, -1), z_dir=(1, 0, 0))):
        with Locations((-42.762863419, 73.514842643)):
            Rectangle(SKETCH1_W, SKETCH1_H)
    extrude(amount=-CUT_EXTRUDE1_DEPTH, mode=Mode.SUBTRACT)

    # Sketch3 → Cut-Extrude2 (cut, through all)
    with BuildSketch(Plane(origin=(0, 0, 0), x_dir=(-1, 0, 0), z_dir=(0, 0, -1))):
        with Locations((-70.738454865, 112.610749995)):
            Circle(SKETCH3_R)
        with Locations((-39.738300723, 81.610750001)):
            Circle(SKETCH3_R)
        with Locations((-70.738129703, 81.610750001)):
            Circle(SKETCH3_R)
        with Locations((-39.73822367, 112.610749995)):
            Circle(SKETCH3_R)
    extrude(amount=-CUT_EXTRUDE2_DEPTH, mode=Mode.SUBTRACT)

    # Sketch4 → Cut-Extrude3 (cut)
    with BuildSketch(Plane(origin=(0, 90, 0), x_dir=(1, 0, 0), z_dir=(0, 1, 0))):
        with Locations(Location((-70.5, -8.5, 0), (0, 0, 270))):
            Circle(SKETCH4_R)
        with Locations(Location((-35.5, -8.5, 0), (0, 0, 270))):
            Circle(SKETCH4_R)
    extrude(amount=-CUT_EXTRUDE3_DEPTH, mode=Mode.SUBTRACT)

    # Fillet1
    fillet1_edges = [part.edges().sort_by_distance(p)[0] for p in [
        (-63, 90, 8.5),
        (-43, 90, 8.5),
    ]]
    fillet(fillet1_edges, radius=FILLET1_R)

    # Chamfer1
    chamfer1_edges = [part.edges().sort_by_distance(p)[0] for p in [
        (43.988300723, 97, 8.560245195),
        (-70.5, 90, 3.5),
        (-35.5, 90, 3.5),
    ]]
    chamfer(chamfer1_edges, length=CHAMFER1_SIZE)


solid = part.part
